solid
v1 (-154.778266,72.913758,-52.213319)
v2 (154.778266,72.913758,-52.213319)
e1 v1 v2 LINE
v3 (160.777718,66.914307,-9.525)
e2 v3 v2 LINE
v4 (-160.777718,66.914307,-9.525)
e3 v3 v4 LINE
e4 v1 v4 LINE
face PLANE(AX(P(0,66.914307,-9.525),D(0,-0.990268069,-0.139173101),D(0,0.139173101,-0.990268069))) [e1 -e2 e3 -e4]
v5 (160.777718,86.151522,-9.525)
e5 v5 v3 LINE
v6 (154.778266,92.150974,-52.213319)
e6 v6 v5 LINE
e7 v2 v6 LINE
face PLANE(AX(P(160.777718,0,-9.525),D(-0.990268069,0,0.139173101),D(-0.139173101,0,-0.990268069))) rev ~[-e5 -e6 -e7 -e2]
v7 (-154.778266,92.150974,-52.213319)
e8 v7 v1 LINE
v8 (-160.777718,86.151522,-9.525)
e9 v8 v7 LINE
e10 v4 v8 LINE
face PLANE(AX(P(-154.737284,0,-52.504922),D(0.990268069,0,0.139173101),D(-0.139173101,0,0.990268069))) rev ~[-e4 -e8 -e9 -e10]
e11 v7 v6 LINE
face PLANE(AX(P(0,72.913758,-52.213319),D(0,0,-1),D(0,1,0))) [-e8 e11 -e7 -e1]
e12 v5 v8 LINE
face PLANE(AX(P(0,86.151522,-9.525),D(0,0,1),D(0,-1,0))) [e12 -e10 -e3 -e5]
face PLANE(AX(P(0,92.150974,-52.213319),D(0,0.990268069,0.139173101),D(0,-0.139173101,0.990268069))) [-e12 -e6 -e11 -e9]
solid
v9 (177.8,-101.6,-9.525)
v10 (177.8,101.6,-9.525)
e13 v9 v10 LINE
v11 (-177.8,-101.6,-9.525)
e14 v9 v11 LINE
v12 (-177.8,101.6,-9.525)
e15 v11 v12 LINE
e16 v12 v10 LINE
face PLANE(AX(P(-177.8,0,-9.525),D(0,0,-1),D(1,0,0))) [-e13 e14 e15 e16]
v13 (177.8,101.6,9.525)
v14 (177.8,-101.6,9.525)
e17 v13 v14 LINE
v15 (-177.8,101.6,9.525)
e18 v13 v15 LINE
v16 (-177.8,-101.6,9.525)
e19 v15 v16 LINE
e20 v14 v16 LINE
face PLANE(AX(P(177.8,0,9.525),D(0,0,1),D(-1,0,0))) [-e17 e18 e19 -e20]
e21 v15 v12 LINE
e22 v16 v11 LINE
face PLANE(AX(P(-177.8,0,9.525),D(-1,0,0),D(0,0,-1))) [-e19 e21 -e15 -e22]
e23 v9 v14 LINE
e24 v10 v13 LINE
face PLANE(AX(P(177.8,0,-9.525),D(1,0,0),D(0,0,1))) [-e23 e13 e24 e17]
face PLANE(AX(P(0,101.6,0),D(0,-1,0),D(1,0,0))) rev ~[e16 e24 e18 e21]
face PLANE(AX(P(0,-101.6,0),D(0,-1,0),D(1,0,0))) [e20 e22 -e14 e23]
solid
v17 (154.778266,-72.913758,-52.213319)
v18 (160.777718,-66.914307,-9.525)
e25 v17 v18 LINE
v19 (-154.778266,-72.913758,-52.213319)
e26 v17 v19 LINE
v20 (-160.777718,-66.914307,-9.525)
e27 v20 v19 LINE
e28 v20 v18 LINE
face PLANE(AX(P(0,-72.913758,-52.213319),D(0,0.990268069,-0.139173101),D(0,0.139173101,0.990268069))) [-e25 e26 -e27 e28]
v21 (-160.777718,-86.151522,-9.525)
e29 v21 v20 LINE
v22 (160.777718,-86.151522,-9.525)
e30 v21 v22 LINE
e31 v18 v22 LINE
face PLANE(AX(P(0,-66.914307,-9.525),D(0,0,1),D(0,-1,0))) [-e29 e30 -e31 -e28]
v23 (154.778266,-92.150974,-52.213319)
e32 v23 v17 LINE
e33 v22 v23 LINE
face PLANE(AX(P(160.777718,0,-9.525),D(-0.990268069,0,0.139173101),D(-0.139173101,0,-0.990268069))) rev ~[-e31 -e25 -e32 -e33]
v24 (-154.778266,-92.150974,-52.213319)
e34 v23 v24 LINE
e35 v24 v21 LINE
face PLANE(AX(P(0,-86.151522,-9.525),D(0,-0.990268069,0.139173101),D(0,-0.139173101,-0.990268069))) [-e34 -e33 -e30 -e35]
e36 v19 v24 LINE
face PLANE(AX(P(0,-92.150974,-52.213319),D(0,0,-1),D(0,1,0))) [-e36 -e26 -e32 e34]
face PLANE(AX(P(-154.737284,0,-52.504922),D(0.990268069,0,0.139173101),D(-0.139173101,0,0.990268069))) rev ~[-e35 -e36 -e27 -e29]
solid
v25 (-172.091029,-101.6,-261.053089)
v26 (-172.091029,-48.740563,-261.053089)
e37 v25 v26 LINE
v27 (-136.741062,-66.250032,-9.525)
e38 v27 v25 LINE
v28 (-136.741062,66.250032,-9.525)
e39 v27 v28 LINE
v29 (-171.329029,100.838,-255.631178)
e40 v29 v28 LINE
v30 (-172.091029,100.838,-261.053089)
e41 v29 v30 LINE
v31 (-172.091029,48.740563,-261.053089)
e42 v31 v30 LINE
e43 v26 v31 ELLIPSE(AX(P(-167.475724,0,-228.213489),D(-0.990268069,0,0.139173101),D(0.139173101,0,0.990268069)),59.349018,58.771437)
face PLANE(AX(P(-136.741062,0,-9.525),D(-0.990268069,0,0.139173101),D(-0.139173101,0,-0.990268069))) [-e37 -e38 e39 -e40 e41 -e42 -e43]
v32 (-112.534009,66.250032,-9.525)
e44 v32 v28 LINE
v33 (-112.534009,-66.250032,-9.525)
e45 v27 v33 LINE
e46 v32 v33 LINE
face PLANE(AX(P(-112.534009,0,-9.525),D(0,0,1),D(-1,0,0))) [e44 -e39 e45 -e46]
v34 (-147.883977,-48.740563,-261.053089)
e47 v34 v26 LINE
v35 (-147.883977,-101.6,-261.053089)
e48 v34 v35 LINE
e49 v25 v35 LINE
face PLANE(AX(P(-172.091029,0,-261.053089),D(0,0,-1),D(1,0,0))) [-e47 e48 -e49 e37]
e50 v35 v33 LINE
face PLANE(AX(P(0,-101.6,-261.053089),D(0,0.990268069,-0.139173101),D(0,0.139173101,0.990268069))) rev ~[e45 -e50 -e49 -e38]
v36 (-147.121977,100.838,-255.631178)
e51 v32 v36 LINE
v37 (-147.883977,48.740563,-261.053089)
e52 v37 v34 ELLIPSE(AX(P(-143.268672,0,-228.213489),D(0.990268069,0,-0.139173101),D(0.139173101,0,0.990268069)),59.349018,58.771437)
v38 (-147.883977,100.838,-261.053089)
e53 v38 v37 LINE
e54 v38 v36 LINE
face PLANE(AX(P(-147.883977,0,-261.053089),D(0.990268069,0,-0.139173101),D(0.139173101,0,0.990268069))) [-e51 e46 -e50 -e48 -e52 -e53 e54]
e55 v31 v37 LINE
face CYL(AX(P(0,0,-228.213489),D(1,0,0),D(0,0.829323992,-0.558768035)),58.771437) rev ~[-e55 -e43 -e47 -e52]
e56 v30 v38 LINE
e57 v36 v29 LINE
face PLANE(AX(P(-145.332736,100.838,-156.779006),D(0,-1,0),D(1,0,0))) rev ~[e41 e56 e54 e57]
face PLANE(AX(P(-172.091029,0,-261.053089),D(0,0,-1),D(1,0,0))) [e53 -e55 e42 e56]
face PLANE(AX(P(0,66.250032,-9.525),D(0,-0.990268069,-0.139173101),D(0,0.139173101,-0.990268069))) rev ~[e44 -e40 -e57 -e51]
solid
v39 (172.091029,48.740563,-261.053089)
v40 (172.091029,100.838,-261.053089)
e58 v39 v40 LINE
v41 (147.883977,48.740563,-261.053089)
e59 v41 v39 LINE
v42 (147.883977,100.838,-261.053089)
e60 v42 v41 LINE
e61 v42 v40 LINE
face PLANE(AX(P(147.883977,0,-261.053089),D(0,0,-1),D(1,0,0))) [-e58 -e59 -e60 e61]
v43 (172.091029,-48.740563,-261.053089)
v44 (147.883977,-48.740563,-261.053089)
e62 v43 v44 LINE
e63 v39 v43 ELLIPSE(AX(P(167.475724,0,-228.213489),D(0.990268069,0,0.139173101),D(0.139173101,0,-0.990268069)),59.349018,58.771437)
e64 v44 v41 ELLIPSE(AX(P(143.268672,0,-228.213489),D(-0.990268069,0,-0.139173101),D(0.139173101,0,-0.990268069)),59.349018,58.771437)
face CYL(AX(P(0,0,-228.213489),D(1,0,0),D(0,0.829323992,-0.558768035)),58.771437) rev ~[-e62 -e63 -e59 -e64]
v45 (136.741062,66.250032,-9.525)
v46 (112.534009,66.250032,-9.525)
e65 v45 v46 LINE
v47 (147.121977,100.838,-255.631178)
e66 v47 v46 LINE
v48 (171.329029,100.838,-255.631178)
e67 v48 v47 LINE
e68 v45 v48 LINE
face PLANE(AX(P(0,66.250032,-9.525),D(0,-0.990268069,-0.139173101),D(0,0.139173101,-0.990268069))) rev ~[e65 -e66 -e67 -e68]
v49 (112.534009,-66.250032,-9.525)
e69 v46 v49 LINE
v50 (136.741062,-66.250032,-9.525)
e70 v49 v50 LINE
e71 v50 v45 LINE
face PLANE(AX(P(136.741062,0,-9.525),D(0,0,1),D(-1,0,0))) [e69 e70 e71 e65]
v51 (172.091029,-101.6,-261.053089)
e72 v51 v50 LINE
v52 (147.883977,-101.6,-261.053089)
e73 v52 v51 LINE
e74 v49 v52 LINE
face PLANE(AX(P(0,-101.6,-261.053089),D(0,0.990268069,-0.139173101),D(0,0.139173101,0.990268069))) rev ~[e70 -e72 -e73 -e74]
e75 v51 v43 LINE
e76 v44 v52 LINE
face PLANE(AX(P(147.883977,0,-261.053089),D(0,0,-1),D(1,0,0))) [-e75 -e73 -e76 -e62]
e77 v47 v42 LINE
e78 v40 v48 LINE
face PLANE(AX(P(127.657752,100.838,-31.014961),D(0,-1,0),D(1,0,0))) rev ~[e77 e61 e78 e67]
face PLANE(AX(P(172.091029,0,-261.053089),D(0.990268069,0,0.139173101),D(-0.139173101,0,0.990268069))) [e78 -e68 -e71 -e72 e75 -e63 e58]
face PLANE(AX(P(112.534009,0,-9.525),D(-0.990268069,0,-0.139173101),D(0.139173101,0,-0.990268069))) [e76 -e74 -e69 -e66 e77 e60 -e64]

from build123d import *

# Parameters (mm, degrees)
F1_DEPTH       = 101.6
F2_DEPTH       = 101.6
F2_DEPTH_BACK  = 100.838
F4_DEPTH       = 177.801
F4_DEPTH_BACK  = 177.801
F6_DEPTH       = 101.601
F6_DEPTH_BACK  = 101.601
F7_DEPTH       = 101.601
F7_DEPTH_BACK  = 101.601
F8_DEPTH       = 161.798
F8_DEPTH_BACK  = 161.798
F9_DEPTH       = 161.798
F9_DEPTH_BACK  = 161.798
F10_DEPTH      = 101.601
F10_DEPTH_BACK = 101.601


# Not quite as in the source:
# - a feature names something its author has since deleted; it is built from what else it names


with BuildPart() as f1:
    # F0 (on Front) → F1 (new body, symmetric)
    with BuildSketch(Plane.XZ):
        Polygon((177.8, -9.525), (177.8, 9.525), (-177.8, 9.525), (-177.8, -9.525), (-160.77771832, -9.525), (-136.7410615279, -9.525), (-112.5340089202, -9.525), (112.5340089202, -9.525), (136.7410615279, -9.525), (160.77771832, -9.525), align=None)
    extrude(amount=F1_DEPTH, both=True)

    # F0 (on Front) → F6 (cut, two sides)
    with BuildSketch(Plane.XZ) as f6_sk:
        Polygon((177.8, -52.5049223718), (177.8, -9.525), (160.77771832, -9.525), (154.7372841544, -52.5049223718), align=None)
    extrude(amount=F6_DEPTH, mode=Mode.SUBTRACT)
    extrude(f6_sk.sketch, amount=-F6_DEPTH_BACK, mode=Mode.SUBTRACT)

    # F0 (on Front) → F7 (cut, two sides)
    with BuildSketch(Plane.XZ) as f7_sk:
        Polygon((-160.77771832, -9.525), (-177.8, -9.525), (-177.8, -52.5049223718), (-154.7372841544, -52.5049223718), align=None)
    extrude(amount=F7_DEPTH, mode=Mode.SUBTRACT)
    extrude(f7_sk.sketch, amount=-F7_DEPTH_BACK, mode=Mode.SUBTRACT)


with BuildPart() as f2:
    # F0 (on Front) → F2 (new body, two sides)
    with BuildSketch(Plane.XZ) as f2_sk:
        Polygon((-118.5744430858, -52.5049223718), (-142.7814956935, -52.5049223718), (-172.0910291718, -261.0530894604), (-147.883976564, -261.0530894604), align=None)
        Polygon((-112.5340089202, -9.525), (-136.7410615279, -9.525), (-142.7814956935, -52.5049223718), (-118.5744430858, -52.5049223718), align=None)
    extrude(amount=F2_DEPTH)
    extrude(f2_sk.sketch, amount=-F2_DEPTH_BACK)


with BuildPart() as f2b:
    # F0 (on Front) → F2, piece 2 (new body, two sides)
    with BuildSketch(Plane.XZ) as f2_2_sk:
        Polygon((142.7814956935, -52.5049223718), (136.7410615279, -9.525), (112.5340089202, -9.525), (118.5744430858, -52.5049223718), align=None)
        Polygon((172.0910291718, -261.0530894604), (142.7814956935, -52.5049223718), (118.5744430858, -52.5049223718), (147.883976564, -261.0530894604), align=None)
    extrude(amount=F2_DEPTH)
    extrude(f2_2_sk.sketch, amount=-F2_DEPTH_BACK)


with BuildPart() as f4_tool:
    # F3 (on Right) → F4 (new body, two sides)
    with BuildSketch(Plane.YZ) as f4_sk:
        Polygon((100.838, -255.6311777319), (100.838, -9.525), (66.2500323562, -9.525), align=None)
        Polygon((-101.6, -261.0530894604), (-66.2500323562, -9.525), (-101.6, -9.525), align=None)
        with BuildLine():
            Line((-48.7405628211, -261.0530894604), (48.7405628211, -261.0530894604))
            ThreePointArc((48.7405628211, -261.0530894604), (0, -169.4420519551), (-48.7405628211, -261.0530894604))
        make_face()
    extrude(amount=F4_DEPTH)
    extrude(f4_sk.sketch, amount=-F4_DEPTH_BACK)


with BuildPart() as f2_1:
    add(f2.part)

    # F4: cut by f4_tool
    add(f4_tool.part, mode=Mode.SUBTRACT)


with BuildPart() as f2b_1:
    add(f2b.part)

    # F4: cut by f4_tool
    add(f4_tool.part, mode=Mode.SUBTRACT)


with BuildPart() as f8:
    # F5 (on Right) → F8 (new body, two sides)
    with BuildSketch(Plane.YZ) as f8_sk:
        Polygon((-72.9137584568, -52.213318646), (-66.9143065223, -9.525), (-86.1515217788, -9.525), (-92.1509737133, -52.213318646), align=None)
    extrude(amount=F8_DEPTH)
    extrude(f8_sk.sketch, amount=-F8_DEPTH_BACK)


with BuildPart() as f9:
    # F5 (on Right) → F9 (new body, two sides)
    with BuildSketch(Plane.YZ) as f9_sk:
        Polygon((66.9143065223, -9.525), (72.9137584568, -52.213318646), (92.1509737133, -52.213318646), (86.1515217788, -9.525), align=None)
    extrude(amount=F9_DEPTH)
    extrude(f9_sk.sketch, amount=-F9_DEPTH_BACK)


with BuildPart() as f10_tool:
    # F0 (on Front) → F10 (new body, two sides)
    with BuildSketch(Plane.XZ) as f10_sk:
        Polygon((177.8, -52.5049223718), (177.8, -9.525), (160.77771832, -9.525), (154.7372841544, -52.5049223718), align=None)
        Polygon((-160.77771832, -9.525), (-177.8, -9.525), (-177.8, -52.5049223718), (-154.7372841544, -52.5049223718), align=None)
    extrude(amount=F10_DEPTH)
    extrude(f10_sk.sketch, amount=-F10_DEPTH_BACK)


with BuildPart() as f8_1:
    add(f8.part)

    # F10: cut by f10_tool
    add(f10_tool.part, mode=Mode.SUBTRACT)

    # F11: cut F2, F2b
    add(f2_1.part, mode=Mode.SUBTRACT)
    add(f2b_1.part, mode=Mode.SUBTRACT)


with BuildPart() as f9_1:
    add(f9.part)

    # F10: cut by f10_tool
    add(f10_tool.part, mode=Mode.SUBTRACT)

    # F11: cut F2, F2b
    add(f2_1.part, mode=Mode.SUBTRACT)
    add(f2b_1.part, mode=Mode.SUBTRACT)


solid = Compound([f1.part, f2_1.part, f2b_1.part, f8_1.part, f9_1.part])
